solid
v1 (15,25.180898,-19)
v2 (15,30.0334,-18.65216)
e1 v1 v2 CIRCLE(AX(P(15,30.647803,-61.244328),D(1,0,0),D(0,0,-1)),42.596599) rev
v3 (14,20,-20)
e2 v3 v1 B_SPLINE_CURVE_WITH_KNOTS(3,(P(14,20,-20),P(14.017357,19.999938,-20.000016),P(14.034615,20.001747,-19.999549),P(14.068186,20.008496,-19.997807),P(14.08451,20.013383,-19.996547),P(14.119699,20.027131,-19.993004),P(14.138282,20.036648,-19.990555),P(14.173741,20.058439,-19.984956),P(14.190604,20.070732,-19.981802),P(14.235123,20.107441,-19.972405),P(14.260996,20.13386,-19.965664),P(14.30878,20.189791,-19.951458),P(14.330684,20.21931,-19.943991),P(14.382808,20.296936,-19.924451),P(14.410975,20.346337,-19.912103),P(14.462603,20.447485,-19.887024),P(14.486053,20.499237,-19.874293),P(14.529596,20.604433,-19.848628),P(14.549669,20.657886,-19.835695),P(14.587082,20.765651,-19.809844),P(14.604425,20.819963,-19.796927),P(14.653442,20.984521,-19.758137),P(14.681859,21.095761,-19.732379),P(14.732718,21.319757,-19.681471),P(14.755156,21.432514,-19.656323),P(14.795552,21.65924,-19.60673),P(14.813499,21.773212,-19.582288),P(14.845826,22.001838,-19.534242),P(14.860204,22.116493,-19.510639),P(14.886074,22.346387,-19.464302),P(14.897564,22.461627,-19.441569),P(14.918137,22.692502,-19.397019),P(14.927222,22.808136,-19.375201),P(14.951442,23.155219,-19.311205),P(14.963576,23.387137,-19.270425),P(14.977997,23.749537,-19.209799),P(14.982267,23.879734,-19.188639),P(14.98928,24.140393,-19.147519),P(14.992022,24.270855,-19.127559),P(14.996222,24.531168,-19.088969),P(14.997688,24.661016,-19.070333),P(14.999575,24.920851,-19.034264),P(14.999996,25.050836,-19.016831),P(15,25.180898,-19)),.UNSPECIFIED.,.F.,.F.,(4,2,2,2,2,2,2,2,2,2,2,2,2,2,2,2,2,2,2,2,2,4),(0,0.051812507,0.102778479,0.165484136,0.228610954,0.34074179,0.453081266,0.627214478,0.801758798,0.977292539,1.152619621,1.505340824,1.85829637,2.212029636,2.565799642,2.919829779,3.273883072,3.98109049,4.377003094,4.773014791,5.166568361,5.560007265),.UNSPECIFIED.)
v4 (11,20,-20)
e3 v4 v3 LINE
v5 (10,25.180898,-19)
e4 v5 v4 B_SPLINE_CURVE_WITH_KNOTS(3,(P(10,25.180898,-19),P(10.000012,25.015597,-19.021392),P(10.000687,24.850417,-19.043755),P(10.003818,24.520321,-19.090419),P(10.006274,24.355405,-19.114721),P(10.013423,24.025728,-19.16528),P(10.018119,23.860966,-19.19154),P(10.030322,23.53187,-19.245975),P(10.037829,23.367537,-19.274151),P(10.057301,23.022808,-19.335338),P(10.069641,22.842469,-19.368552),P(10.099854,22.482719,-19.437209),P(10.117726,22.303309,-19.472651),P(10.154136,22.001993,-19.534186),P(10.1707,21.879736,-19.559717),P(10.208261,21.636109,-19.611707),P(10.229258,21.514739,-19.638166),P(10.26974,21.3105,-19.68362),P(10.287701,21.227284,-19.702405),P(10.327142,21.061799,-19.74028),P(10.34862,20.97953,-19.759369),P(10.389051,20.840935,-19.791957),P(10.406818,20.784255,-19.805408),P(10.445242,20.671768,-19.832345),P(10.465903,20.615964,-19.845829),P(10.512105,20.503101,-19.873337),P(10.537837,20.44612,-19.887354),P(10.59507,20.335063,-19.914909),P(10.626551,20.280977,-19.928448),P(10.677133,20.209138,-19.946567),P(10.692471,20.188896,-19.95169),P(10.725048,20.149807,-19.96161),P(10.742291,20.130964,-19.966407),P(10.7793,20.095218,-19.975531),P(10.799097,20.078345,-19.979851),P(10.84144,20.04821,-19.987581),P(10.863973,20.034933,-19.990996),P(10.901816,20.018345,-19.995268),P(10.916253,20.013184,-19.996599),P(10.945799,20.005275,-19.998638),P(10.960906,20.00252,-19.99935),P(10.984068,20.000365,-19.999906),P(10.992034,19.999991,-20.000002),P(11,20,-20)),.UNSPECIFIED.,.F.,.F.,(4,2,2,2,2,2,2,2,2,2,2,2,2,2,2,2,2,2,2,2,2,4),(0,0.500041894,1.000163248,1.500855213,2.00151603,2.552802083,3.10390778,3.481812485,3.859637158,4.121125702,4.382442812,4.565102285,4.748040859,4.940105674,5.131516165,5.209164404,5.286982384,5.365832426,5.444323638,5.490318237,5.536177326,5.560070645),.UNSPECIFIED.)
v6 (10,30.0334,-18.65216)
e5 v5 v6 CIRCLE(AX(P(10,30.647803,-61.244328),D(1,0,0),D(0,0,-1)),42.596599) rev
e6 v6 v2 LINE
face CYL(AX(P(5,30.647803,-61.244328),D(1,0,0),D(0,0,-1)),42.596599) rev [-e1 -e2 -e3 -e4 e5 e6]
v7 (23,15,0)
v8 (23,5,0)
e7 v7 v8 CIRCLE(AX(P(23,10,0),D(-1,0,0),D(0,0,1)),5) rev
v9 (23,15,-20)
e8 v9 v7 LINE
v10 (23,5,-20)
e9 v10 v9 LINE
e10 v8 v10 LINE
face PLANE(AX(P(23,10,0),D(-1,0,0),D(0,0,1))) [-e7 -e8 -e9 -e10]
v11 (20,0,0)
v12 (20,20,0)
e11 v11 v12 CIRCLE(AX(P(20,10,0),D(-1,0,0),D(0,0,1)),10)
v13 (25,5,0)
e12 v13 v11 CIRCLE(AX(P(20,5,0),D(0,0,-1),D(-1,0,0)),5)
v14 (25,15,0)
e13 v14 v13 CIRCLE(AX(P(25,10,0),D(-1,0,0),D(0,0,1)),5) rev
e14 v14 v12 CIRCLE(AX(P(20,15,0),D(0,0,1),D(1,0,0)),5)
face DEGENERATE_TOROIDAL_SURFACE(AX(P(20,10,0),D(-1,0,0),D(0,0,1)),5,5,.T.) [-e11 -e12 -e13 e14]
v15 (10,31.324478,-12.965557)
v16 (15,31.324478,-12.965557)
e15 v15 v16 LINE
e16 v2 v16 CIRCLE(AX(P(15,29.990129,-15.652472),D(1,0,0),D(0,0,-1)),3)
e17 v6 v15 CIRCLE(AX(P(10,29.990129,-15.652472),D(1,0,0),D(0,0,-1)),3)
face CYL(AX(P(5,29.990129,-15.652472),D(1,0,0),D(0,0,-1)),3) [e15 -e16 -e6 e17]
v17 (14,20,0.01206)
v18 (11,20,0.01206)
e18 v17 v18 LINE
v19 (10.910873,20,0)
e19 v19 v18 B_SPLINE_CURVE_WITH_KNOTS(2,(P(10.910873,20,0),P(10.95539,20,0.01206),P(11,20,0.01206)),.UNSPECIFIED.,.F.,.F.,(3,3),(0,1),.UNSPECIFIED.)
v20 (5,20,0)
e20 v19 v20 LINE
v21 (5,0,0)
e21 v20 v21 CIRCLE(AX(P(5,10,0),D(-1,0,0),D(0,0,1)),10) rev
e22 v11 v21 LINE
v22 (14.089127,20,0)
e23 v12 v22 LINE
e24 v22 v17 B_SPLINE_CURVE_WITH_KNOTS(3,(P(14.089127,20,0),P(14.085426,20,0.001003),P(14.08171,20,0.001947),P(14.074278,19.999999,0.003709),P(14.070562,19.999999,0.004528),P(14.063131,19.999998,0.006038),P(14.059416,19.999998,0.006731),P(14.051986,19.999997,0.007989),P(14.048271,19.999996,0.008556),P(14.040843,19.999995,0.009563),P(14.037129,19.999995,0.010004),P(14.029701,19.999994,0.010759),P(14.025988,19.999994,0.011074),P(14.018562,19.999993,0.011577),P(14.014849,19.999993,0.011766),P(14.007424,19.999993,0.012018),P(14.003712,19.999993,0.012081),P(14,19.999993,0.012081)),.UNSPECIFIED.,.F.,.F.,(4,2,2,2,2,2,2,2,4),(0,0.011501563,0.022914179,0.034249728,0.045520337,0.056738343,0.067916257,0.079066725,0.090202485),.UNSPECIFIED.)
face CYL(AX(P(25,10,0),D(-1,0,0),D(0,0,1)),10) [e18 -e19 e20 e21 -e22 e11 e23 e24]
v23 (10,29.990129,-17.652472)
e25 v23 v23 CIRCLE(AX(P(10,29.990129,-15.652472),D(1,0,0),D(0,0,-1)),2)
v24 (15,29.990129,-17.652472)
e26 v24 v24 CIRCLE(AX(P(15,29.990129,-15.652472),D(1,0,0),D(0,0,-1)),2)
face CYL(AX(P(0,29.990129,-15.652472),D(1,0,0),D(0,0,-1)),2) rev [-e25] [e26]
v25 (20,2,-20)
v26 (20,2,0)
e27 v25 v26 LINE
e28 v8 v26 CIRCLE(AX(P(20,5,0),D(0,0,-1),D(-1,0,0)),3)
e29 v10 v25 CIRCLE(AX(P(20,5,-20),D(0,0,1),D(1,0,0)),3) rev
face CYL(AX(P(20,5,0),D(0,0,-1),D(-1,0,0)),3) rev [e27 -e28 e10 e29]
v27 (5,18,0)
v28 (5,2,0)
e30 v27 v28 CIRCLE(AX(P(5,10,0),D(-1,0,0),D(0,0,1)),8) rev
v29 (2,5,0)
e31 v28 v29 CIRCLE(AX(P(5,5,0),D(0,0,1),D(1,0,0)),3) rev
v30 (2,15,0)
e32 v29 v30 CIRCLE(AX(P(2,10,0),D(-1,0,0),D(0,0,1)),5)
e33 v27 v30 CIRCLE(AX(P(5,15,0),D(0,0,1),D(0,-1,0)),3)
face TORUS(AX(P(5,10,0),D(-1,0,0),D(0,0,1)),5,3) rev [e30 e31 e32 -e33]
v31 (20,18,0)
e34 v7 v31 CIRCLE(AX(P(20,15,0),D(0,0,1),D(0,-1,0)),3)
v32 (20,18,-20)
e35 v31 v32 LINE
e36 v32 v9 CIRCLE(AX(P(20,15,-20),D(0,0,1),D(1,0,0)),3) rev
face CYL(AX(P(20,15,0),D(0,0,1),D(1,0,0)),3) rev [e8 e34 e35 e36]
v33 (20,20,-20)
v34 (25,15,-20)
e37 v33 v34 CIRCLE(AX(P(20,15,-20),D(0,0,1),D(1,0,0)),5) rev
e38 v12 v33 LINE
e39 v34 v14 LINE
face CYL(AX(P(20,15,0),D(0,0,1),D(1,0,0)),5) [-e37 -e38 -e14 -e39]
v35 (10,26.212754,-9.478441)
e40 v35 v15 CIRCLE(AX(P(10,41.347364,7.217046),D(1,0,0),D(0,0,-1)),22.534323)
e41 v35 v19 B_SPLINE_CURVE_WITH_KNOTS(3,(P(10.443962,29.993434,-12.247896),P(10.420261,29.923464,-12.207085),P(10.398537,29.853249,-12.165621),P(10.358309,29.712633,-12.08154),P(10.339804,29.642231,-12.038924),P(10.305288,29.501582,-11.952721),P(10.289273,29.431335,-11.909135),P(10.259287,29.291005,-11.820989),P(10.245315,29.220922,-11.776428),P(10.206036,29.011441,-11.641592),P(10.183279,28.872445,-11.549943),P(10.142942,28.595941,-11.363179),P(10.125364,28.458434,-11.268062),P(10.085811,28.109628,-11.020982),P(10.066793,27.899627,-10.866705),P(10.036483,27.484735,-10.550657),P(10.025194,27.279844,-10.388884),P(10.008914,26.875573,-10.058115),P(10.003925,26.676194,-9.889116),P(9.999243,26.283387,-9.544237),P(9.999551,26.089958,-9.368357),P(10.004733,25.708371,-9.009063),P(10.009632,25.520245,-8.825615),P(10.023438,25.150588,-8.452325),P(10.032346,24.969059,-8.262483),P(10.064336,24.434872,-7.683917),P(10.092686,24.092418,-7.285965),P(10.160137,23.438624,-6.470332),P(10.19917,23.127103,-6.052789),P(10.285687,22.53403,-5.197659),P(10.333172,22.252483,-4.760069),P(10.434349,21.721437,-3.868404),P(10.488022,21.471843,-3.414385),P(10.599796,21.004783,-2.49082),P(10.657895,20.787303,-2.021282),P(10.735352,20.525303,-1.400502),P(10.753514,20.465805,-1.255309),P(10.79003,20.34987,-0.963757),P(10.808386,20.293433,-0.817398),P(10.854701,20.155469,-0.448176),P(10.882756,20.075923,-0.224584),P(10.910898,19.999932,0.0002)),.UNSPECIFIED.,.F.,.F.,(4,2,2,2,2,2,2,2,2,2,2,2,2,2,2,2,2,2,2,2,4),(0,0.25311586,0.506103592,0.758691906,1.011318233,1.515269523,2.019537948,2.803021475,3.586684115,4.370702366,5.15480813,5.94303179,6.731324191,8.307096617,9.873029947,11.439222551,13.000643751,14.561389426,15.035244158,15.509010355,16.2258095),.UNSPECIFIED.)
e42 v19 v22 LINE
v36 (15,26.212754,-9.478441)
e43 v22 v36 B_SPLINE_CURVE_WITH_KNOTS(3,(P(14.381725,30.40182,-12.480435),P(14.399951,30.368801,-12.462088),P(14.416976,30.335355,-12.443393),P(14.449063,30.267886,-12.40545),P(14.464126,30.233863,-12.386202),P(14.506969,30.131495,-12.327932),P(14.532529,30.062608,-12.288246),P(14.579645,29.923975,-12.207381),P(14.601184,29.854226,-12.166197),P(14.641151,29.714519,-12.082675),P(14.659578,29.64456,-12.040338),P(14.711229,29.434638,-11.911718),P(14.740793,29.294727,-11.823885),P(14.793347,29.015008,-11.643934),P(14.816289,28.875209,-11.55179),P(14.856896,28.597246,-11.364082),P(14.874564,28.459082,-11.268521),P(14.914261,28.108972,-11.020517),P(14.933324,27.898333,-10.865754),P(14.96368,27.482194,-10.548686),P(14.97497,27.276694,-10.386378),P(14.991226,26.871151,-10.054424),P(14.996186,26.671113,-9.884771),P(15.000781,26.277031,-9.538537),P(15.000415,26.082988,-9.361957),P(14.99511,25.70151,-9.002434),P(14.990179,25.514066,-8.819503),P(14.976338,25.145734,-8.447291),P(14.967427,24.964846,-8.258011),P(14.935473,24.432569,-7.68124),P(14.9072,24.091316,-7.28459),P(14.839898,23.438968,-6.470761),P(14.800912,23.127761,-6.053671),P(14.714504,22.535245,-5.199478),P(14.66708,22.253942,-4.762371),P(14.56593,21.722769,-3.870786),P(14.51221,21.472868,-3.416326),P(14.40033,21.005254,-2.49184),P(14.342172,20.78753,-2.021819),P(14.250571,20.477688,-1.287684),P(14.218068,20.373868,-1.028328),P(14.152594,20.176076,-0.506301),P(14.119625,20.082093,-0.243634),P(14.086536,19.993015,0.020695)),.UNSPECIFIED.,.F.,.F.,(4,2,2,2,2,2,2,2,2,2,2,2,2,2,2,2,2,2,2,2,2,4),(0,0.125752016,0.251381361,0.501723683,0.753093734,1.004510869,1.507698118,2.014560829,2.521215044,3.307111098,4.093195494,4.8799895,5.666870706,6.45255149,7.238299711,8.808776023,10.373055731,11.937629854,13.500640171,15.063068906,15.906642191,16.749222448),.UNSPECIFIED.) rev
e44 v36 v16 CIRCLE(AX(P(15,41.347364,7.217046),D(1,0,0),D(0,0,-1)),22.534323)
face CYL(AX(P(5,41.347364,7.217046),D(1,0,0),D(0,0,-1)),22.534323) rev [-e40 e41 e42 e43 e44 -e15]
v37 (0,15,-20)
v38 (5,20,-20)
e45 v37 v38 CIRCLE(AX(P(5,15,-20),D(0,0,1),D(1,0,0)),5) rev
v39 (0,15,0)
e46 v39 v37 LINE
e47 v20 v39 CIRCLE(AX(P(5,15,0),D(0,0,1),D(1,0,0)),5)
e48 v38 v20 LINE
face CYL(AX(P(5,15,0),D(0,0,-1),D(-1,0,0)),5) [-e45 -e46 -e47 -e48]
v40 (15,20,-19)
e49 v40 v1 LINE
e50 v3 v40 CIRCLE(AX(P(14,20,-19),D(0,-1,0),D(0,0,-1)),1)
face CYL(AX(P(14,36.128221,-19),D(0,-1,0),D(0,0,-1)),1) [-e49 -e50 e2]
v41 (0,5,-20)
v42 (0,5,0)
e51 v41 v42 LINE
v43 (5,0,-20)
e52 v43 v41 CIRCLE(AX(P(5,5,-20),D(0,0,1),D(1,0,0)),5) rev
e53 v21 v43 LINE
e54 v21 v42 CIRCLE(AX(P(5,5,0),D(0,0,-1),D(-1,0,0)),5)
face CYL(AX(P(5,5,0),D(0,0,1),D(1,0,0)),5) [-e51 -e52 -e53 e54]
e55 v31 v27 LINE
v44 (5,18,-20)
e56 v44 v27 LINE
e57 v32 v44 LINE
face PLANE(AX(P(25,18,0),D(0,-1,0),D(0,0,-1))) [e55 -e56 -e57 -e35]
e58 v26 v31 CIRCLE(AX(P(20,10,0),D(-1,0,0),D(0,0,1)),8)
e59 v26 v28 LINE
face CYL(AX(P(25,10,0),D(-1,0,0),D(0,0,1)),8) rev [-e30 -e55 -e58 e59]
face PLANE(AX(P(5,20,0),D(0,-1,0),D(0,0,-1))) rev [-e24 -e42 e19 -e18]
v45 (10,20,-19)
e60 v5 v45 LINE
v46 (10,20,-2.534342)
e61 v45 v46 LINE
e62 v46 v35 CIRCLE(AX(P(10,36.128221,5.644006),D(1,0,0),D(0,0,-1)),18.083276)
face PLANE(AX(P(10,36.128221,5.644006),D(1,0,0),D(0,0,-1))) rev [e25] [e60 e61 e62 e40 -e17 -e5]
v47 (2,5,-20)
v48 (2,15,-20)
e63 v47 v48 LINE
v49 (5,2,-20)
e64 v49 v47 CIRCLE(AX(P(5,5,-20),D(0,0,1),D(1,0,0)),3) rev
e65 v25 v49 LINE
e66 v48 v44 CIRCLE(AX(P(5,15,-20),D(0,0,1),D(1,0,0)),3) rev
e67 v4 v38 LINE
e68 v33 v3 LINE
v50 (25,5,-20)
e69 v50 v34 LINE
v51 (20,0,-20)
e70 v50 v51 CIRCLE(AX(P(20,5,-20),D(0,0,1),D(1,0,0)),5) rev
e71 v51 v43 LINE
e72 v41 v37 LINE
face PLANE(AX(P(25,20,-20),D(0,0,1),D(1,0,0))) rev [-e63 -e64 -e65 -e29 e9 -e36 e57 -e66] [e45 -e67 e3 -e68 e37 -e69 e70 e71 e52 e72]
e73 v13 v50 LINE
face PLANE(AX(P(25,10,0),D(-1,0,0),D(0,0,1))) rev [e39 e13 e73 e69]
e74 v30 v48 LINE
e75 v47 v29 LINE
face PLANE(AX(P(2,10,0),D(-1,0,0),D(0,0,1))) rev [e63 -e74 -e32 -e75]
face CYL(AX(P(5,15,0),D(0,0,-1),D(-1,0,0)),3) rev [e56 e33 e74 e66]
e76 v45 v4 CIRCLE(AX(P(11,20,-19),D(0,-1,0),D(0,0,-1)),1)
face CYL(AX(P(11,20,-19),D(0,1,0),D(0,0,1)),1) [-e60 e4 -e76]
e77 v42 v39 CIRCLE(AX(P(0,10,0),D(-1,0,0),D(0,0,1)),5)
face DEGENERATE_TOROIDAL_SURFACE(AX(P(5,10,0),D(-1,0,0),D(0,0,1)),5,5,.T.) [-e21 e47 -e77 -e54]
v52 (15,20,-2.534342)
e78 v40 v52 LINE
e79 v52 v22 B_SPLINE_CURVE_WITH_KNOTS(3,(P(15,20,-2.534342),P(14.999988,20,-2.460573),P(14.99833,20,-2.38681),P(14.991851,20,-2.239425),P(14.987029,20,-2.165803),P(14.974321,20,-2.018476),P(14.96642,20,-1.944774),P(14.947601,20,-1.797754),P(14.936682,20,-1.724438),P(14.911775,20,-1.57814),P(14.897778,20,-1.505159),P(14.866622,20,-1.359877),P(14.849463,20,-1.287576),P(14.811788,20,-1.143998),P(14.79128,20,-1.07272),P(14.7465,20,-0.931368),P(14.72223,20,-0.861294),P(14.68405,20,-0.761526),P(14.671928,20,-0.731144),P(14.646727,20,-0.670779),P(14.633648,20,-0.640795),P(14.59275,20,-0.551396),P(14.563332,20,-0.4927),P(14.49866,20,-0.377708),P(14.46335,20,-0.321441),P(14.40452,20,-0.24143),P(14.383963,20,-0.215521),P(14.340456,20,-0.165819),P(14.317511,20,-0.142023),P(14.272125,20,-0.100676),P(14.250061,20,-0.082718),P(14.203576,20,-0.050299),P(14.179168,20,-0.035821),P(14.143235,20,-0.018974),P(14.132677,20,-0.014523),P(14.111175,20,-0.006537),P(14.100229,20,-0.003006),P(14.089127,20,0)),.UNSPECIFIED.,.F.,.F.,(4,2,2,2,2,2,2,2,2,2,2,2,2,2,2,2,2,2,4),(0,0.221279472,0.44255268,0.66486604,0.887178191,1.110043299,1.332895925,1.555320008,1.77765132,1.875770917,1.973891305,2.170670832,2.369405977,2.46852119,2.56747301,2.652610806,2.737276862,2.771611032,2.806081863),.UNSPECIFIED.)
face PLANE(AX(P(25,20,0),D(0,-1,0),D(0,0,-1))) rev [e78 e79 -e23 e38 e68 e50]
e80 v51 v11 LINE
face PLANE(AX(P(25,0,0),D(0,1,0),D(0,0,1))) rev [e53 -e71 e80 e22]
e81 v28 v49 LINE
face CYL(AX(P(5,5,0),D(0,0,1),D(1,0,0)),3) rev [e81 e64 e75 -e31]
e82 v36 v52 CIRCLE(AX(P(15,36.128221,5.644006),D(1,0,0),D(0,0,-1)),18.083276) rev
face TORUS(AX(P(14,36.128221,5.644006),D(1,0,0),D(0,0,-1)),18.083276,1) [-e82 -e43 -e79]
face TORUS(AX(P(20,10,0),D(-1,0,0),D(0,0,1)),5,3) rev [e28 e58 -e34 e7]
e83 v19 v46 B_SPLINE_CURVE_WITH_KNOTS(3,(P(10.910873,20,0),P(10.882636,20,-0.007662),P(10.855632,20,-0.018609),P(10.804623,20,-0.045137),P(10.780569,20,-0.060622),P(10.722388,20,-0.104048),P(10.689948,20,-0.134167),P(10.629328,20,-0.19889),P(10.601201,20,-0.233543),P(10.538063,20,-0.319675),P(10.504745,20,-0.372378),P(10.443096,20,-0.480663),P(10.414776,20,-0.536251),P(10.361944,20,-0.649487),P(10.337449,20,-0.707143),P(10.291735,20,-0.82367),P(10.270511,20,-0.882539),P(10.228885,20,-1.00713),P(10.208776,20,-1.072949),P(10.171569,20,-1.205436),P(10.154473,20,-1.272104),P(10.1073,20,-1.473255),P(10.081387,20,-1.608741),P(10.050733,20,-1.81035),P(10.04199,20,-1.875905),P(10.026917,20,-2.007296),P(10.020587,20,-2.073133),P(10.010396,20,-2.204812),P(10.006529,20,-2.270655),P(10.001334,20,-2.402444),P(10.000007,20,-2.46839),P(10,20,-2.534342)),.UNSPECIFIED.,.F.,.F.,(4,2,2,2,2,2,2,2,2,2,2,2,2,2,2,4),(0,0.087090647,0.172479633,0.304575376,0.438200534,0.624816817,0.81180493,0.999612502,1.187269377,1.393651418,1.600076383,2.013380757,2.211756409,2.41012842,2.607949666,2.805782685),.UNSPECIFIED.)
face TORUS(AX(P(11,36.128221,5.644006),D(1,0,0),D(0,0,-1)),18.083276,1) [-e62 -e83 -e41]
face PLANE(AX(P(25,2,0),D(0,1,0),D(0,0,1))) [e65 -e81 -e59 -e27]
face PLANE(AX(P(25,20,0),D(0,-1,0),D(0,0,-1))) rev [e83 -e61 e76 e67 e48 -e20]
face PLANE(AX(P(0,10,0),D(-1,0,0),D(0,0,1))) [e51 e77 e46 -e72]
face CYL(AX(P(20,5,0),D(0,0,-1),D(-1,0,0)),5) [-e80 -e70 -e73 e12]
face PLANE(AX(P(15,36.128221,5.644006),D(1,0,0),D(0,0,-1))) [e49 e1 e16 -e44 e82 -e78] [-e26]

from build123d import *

# Parameters (mm, degrees)
SALIENTE_EXTRUIR1_DEPTH = 25
REDONDEO1_R             = 5
VACIADO1_T              = -2
SALIENTE_EXTRUIR2_DEPTH = 2.5
REDONDEO3_R             = 1
CROQUIS4_R              = 2
CORTAR_EXTRUIR1_DEPTH   = 43.193943257
CORTAR_EXTRUIR2_DEPTH   = 10


with BuildPart() as part:
    # Croquis1 → Saliente-Extruir1 (new body)
    with BuildSketch(Plane(origin=(0, 0, 0), x_dir=(0, 0, -1), z_dir=(1, 0, 0))):
        with BuildLine():
            Line((0, 0), (20, 0))
            Line((20, 0), (20, 20))
            Line((20, 20), (0, 20))
            ThreePointArc((0, 20), (-10, 10), (0, 0))
        make_face()
    extrude(amount=SALIENTE_EXTRUIR1_DEPTH)

    # Redondeo1
    redondeo1_edges = [part.edges().sort_by_distance(p)[0] for p in [
        (0, 0, -10),
        (0, 10, 10),
        (25, 0, -10),
        (25, 10, 10),
        (0, 20, -10),
        (25, 20, -10),
    ]]
    fillet(redondeo1_edges, radius=REDONDEO1_R)

    # Vaciado1
    vaciado1_openings = [part.faces().sort_by_distance(p)[0] for p in [
        (12.5, 10, -20),
    ]]
    offset(amount=VACIADO1_T, openings=vaciado1_openings, kind=Kind.INTERSECTION)


with BuildPart() as saliente_extruir2_tool:
    # Croquis3 → Saliente-Extruir2 (new, symmetric)
    with BuildSketch(Plane(origin=(12.5, 0, 0), x_dir=(0, 0, -1), z_dir=(1, 0, 0))):
        with BuildLine():
            Line((20, 20), (20, 33.990128519))
            Line((20, 33.990128519), (11.304943529, 33.990128519))
            ThreePointArc((11.304943529, 33.990128519), (7.637753489, 25.384236828), (-0.012060129, 20))
            Line((-0.012060129, 20), (20, 20))
        make_face()
    extrude(amount=SALIENTE_EXTRUIR2_DEPTH, both=True)


with BuildPart() as part_1:
    add(part.part)


with BuildPart() as part_2:
    # Saliente-Extruir2: joined with saliente_extruir2_tool
    add(part_1.part.fuse(saliente_extruir2_tool.part, tol=0.00001))

    # Redondeo3
    redondeo3_edges = [part_2.edges().sort_by_distance(p)[0] for p in [
        (15, 33.990128519, -15.652471765),
        (15, 26.99506426, -20),
        (15, 25.384236828, -7.637753489),
        (10, 26.99506426, -20),
        (10, 25.384236828, -7.637753489),
        (10, 33.990128519, -15.652471765),
    ]]
    fillet(redondeo3_edges, radius=REDONDEO3_R)

    # Croquis4 → Cortar-Extruir1 (cut, through all)
    with BuildSketch(Plane(origin=(15, 0, 0), x_dir=(0, 0, -1), z_dir=(1, 0, 0))):
        with Locations((15.652471765, 29.990128519)):
            Circle(CROQUIS4_R)
    extrude(amount=-CORTAR_EXTRUIR1_DEPTH, mode=Mode.SUBTRACT)

    # Croquis5 → Cortar-Extruir2 (cut)
    with BuildSketch(Plane(origin=(15, 0, 0), x_dir=(0, 0, -1), z_dir=(1, 0, 0))):
        with BuildLine():
            Line((-7.217046024, 20), (0, 20))
            ThreePointArc((0, 20), (7.606790839, 24.37534101), (12.965556832, 31.324477852))
            ThreePointArc((12.965556832, 31.324477852), (16.316683617, 32.915675069), (18.652159682, 30.033399776))
            ThreePointArc((18.652159682, 30.033399776), (19.02695235, 24.97651649), (20, 20))
            Line((20, 20), (25.571513897, 20))
            Line((25.571513897, 20), (25.571513897, 39.781584786))
            Line((25.571513897, 39.781584786), (-7.217046024, 39.781584786))
            Line((-7.217046024, 39.781584786), (-7.217046024, 20))
        make_face()
    extrude(amount=-CORTAR_EXTRUIR2_DEPTH, mode=Mode.SUBTRACT)


solid = part_2.part
